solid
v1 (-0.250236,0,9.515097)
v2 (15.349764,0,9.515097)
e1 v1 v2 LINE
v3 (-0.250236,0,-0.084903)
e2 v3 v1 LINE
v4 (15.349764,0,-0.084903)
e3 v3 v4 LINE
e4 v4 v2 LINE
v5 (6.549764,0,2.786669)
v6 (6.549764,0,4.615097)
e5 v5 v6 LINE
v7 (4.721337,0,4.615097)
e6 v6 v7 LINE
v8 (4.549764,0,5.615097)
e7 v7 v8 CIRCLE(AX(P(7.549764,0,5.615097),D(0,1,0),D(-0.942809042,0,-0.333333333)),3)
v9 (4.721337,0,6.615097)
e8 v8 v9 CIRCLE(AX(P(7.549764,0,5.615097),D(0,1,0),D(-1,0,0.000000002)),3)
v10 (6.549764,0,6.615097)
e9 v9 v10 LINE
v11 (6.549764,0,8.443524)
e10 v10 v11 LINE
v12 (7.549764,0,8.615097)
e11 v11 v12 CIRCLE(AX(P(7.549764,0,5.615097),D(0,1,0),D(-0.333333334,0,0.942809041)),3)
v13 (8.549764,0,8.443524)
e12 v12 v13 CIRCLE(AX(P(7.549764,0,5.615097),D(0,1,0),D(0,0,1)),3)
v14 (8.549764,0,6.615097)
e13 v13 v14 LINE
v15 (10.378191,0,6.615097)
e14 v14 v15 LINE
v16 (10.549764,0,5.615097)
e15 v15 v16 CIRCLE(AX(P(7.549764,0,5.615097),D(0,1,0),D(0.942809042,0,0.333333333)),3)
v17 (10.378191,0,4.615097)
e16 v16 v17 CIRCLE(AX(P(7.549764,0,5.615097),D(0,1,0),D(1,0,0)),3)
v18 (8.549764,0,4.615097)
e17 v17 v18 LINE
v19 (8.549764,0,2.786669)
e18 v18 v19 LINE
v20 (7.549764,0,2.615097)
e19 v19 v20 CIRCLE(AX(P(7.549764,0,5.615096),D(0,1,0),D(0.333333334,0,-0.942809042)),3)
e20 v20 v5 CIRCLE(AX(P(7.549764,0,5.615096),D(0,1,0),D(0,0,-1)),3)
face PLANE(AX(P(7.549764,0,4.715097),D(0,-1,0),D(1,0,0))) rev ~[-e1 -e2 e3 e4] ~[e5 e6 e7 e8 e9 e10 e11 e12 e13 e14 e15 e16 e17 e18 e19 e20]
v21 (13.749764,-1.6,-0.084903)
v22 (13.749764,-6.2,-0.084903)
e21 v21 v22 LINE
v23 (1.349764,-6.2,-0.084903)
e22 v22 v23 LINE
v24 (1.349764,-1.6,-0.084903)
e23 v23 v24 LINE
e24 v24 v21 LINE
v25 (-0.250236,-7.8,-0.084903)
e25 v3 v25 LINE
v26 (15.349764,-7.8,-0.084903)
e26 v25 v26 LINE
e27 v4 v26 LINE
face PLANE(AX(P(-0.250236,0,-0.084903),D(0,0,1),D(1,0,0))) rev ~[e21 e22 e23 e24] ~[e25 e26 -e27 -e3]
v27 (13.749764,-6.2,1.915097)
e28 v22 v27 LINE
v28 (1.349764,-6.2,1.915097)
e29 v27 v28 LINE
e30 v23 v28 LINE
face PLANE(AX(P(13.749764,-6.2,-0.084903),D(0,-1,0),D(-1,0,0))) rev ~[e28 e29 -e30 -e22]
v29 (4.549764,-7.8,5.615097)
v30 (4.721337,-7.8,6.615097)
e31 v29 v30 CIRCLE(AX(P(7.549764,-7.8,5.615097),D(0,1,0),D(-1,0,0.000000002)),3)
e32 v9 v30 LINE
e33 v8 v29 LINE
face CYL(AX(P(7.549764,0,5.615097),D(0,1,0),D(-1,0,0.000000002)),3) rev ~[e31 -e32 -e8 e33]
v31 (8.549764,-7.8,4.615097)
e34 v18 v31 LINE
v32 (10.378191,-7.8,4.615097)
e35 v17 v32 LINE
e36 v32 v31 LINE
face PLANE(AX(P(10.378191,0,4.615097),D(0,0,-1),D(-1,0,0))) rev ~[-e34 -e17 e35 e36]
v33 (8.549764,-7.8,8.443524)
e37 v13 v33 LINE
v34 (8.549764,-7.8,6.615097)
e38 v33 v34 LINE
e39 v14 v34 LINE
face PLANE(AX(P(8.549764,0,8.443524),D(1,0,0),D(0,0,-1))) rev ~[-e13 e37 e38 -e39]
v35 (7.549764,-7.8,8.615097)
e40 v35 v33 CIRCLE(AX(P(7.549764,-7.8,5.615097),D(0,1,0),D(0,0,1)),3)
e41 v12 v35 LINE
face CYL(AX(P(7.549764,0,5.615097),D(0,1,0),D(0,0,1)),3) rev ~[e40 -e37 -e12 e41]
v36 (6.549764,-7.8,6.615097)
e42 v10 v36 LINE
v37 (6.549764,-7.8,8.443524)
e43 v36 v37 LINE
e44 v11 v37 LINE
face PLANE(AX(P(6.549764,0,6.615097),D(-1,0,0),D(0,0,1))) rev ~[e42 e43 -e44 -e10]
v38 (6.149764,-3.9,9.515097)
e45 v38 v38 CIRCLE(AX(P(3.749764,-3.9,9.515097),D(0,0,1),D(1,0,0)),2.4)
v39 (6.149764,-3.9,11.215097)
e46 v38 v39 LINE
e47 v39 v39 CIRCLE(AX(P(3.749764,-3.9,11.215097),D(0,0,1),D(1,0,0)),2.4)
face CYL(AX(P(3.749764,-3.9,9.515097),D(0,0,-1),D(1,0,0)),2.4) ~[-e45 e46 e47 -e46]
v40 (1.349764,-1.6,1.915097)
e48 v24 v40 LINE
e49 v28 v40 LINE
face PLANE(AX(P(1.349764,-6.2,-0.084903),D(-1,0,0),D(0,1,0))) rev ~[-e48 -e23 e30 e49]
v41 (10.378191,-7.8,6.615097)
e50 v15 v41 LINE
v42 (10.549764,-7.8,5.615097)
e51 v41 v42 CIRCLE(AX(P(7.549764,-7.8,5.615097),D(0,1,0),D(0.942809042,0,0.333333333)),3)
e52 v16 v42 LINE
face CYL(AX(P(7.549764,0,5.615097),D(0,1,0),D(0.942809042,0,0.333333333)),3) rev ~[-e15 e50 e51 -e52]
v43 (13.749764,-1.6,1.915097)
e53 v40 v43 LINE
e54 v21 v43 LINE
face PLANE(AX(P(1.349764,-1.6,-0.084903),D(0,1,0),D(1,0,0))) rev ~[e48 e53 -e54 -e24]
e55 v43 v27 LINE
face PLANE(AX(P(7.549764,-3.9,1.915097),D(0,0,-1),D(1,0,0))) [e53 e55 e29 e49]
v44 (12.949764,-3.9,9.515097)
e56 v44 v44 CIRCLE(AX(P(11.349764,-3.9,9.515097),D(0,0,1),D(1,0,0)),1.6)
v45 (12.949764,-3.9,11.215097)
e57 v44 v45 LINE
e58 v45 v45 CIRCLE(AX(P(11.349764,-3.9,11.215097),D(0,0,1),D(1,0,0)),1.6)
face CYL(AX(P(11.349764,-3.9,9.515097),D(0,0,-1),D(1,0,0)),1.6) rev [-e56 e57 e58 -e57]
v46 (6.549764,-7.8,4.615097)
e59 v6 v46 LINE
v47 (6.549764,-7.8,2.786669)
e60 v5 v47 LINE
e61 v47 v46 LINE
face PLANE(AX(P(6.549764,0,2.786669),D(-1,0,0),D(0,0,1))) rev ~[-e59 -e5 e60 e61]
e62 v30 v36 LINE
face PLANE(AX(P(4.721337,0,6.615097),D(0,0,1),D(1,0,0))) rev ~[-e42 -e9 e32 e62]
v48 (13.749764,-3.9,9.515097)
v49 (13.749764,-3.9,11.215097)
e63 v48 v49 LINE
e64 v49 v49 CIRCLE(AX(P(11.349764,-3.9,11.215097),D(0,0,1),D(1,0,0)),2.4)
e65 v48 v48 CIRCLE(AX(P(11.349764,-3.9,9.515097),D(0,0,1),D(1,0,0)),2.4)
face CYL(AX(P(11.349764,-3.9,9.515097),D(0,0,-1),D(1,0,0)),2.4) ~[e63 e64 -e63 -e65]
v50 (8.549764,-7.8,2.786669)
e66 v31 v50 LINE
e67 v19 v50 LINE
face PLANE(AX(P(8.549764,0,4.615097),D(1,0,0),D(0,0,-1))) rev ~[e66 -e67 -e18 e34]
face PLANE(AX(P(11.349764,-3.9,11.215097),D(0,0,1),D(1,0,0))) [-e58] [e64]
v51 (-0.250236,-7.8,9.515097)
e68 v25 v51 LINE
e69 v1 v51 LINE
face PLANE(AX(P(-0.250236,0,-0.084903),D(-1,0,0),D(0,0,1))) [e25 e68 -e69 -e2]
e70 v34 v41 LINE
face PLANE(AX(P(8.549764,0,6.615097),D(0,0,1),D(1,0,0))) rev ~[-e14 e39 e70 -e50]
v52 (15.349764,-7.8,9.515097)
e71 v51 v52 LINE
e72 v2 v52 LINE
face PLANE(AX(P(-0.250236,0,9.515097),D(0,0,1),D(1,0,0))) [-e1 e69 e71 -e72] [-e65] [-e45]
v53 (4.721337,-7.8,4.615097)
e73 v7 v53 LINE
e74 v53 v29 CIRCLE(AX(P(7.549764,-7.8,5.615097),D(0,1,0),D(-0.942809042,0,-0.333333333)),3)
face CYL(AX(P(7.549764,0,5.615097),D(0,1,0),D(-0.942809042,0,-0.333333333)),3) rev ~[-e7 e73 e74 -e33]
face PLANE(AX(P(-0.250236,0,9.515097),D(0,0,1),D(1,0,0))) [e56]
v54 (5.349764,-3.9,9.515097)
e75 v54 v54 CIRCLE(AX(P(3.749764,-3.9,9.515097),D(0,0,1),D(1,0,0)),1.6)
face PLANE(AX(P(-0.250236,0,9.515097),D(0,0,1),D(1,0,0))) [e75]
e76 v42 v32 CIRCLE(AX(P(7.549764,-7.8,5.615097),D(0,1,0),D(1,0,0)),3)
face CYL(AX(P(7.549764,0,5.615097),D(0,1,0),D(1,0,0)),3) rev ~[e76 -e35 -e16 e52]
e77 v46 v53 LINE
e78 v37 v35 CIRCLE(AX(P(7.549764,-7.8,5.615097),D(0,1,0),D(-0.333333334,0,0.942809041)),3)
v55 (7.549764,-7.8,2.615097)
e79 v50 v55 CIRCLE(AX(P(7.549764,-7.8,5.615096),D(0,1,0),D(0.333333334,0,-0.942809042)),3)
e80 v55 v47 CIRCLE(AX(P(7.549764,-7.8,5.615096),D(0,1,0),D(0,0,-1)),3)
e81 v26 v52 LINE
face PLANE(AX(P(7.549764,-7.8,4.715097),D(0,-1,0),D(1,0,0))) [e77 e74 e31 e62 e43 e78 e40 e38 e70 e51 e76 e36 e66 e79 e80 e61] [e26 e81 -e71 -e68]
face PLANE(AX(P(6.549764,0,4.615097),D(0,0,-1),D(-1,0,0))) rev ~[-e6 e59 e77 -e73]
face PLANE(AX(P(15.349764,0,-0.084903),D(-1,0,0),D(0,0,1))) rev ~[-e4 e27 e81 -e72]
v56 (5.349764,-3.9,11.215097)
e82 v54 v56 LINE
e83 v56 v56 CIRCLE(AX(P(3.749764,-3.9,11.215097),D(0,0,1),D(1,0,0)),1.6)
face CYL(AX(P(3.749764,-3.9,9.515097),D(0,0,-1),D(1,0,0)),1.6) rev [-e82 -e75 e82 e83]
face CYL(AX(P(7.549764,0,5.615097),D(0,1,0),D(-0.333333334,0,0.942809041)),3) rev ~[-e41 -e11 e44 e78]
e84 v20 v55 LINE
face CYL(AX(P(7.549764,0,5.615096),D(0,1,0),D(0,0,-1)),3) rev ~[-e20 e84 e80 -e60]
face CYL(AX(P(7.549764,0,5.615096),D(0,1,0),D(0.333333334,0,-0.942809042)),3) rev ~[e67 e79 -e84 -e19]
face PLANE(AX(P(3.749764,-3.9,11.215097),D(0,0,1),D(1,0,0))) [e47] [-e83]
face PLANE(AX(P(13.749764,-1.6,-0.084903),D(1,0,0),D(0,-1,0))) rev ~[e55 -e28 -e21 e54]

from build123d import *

# Parameters (mm, degrees)
F0_W     = 15.6
F0_H     = 9.6
F1_DEPTH = 7.8
F2_R     = 2.4
F2_R_2   = 1.6
F3_DEPTH = 1.7
F5_DEPTH = 2


# Not quite as in the source:
# - a feature names something its author has since deleted; it is built from what else it names


with BuildPart() as f1:
    # F0 (on Front) → F1 (new body)
    with BuildSketch(Plane.XZ):
        with Locations((7.5497636572, 4.7150965011)):
            Rectangle(F0_W, F0_H)
        with BuildLine():
            Line((10.5497636572, 6.6150965011), (10.5497636572, 5.6150965011))
            Line((10.5497636572, 5.6150965011), (10.5497636572, 4.6150965011))
            Line((10.5497636572, 4.6150965011), (10.3781907819, 4.6150965011))
            ThreePointArc((10.3781907819, 4.6150965011), (9.6710840007, 3.4937761575), (8.5497636572, 2.7866693764))
            Line((8.5497636572, 2.7866693764), (8.5497636572, 2.6150965011))
            Line((8.5497636572, 2.6150965011), (7.5497636572, 2.6150965011))
            Line((7.5497636572, 2.6150965011), (6.5497636572, 2.6150965011))
            Line((6.5497636572, 2.6150965011), (6.5497636572, 2.7866693764))
            ThreePointArc((6.5497636572, 2.7866693764), (5.4284433136, 3.4937761575), (4.7213365324, 4.6150965011))
            Line((4.7213365324, 4.6150965011), (4.5497636572, 4.6150965011))
            Line((4.5497636572, 4.6150965011), (4.5497636572, 5.6150965067))
            Line((4.5497636572, 5.6150965067), (4.5497636572, 6.6150965011))
            Line((4.5497636572, 6.6150965011), (4.7213365324, 6.6150965011))
            ThreePointArc((4.7213365324, 6.6150965011), (5.4284433136, 7.7364168447), (6.5497636572, 8.4435236258))
            Line((6.5497636572, 8.4435236258), (6.5497636572, 8.6150965011))
            Line((6.5497636572, 8.6150965011), (7.5497636572, 8.6150965011))
            Line((7.5497636572, 8.6150965011), (8.5497636572, 8.6150965011))
            Line((8.5497636572, 8.6150965011), (8.5497636572, 8.4435236258))
            ThreePointArc((8.5497636572, 8.4435236258), (9.6710840007, 7.7364168447), (10.3781907819, 6.6150965011))
            Line((10.3781907819, 6.6150965011), (10.5497636572, 6.6150965011))
        make_face(mode=Mode.SUBTRACT)
        with BuildLine():
            ThreePointArc((8.5497636572, 2.7866693764), (9.6710840007, 3.4937761575), (10.3781907819, 4.6150965011))
            Line((10.3781907819, 4.6150965011), (8.5497636572, 4.6150965011))
            Line((8.5497636572, 4.6150965011), (8.5497636572, 2.7866693764))
        make_face()
        with BuildLine():
            Line((8.5497636572, 6.6150965011), (10.3781907819, 6.6150965011))
            ThreePointArc((10.3781907819, 6.6150965011), (9.6710840007, 7.7364168447), (8.5497636572, 8.4435236258))
            Line((8.5497636572, 8.4435236258), (8.5497636572, 6.6150965011))
        make_face()
        with BuildLine():
            Line((4.7213365324, 6.6150965011), (6.5497636572, 6.6150965011))
            Line((6.5497636572, 6.6150965011), (6.5497636572, 8.4435236258))
            ThreePointArc((6.5497636572, 8.4435236258), (5.4284433136, 7.7364168447), (4.7213365324, 6.6150965011))
        make_face()
        with BuildLine():
            Line((6.5497636572, 2.7866693764), (6.5497636572, 4.6150965011))
            Line((6.5497636572, 4.6150965011), (4.7213365324, 4.6150965011))
            ThreePointArc((4.7213365324, 4.6150965011), (5.4284433136, 3.4937761575), (6.5497636572, 2.7866693764))
        make_face()
        with BuildLine():
            Line((10.5497636572, 4.6150965011), (10.5497636572, 5.6150965011))
            ThreePointArc((10.5497636572, 5.6150965011), (10.5065593361, 5.1077905649), (10.3781907819, 4.6150965011))
            Line((10.3781907819, 4.6150965011), (10.5497636572, 4.6150965011))
        make_face()
        with BuildLine():
            ThreePointArc((10.3781907819, 6.6150965011), (10.5065593361, 6.1224024373), (10.5497636572, 5.6150965011))
            Line((10.5497636572, 5.6150965011), (10.5497636572, 6.6150965011))
            Line((10.5497636572, 6.6150965011), (10.3781907819, 6.6150965011))
        make_face()
        with BuildLine():
            ThreePointArc((7.5497636572, 8.6150965011), (8.0570695933, 8.5718921801), (8.5497636572, 8.4435236258))
            Line((8.5497636572, 8.4435236258), (8.5497636572, 8.6150965011))
            Line((8.5497636572, 8.6150965011), (7.5497636572, 8.6150965011))
        make_face()
        with BuildLine():
            ThreePointArc((6.5497636572, 8.4435236258), (7.042457721, 8.5718921801), (7.5497636572, 8.6150965011))
            Line((7.5497636572, 8.6150965011), (6.5497636572, 8.6150965011))
            Line((6.5497636572, 8.6150965011), (6.5497636572, 8.4435236258))
        make_face()
        with BuildLine():
            ThreePointArc((4.5497636572, 5.6150965067), (4.5929679787, 6.12240244), (4.7213365324, 6.6150965011))
            Line((4.7213365324, 6.6150965011), (4.5497636572, 6.6150965011))
            Line((4.5497636572, 6.6150965011), (4.5497636572, 5.6150965067))
        make_face()
        with BuildLine():
            Line((4.5497636572, 4.6150965011), (4.7213365324, 4.6150965011))
            ThreePointArc((4.7213365324, 4.6150965011), (4.5929679777, 5.1077905677), (4.5497636572, 5.6150965067))
            Line((4.5497636572, 5.6150965067), (4.5497636572, 4.6150965011))
        make_face()
        with BuildLine():
            Line((6.5497636572, 2.6150965011), (7.5497636572, 2.6150965011))
            ThreePointArc((7.5497636572, 2.6150965011), (7.042457721, 2.6583008221), (6.5497636572, 2.7866693764))
            Line((6.5497636572, 2.7866693764), (6.5497636572, 2.6150965011))
        make_face()
        with BuildLine():
            Line((8.5497636572, 2.6150965011), (8.5497636572, 2.7866693764))
            ThreePointArc((8.5497636572, 2.7866693764), (8.0570695933, 2.6583008221), (7.5497636572, 2.6150965011))
            Line((7.5497636572, 2.6150965011), (8.5497636572, 2.6150965011))
        make_face()
    extrude(amount=F1_DEPTH)

    # F2 (on face) → F3 (join)
    with BuildSketch(Plane.XY.offset(9.5150965011)):
        with Locations((3.7497636572, -3.9)):
            Circle(F2_R)
        with Locations((3.7497636572, -3.9)):
            Circle(F2_R_2, mode=Mode.SUBTRACT)
        with Locations((11.3497636572, -3.9)):
            Circle(F2_R)
        with Locations((11.3497636572, -3.9)):
            Circle(F2_R_2, mode=Mode.SUBTRACT)
    extrude(amount=F3_DEPTH)

    # F4 (on face) → F5 (cut)
    with BuildSketch(Plane(origin=(0, 0, -0.0849034989), x_dir=(1, 0, 0), z_dir=(0, 0, -1))):
        Polygon((1.3497636572, 6.2), (1.3497636572, 3.9), (1.3497636572, 1.6), (7.5497636572, 1.6), (13.7497636572, 1.6), (13.7497636572, 3.9), (13.7497636572, 6.2), (7.5497636572, 6.2), align=None)
    extrude(amount=-F5_DEPTH, mode=Mode.SUBTRACT)


solid = f1.part
